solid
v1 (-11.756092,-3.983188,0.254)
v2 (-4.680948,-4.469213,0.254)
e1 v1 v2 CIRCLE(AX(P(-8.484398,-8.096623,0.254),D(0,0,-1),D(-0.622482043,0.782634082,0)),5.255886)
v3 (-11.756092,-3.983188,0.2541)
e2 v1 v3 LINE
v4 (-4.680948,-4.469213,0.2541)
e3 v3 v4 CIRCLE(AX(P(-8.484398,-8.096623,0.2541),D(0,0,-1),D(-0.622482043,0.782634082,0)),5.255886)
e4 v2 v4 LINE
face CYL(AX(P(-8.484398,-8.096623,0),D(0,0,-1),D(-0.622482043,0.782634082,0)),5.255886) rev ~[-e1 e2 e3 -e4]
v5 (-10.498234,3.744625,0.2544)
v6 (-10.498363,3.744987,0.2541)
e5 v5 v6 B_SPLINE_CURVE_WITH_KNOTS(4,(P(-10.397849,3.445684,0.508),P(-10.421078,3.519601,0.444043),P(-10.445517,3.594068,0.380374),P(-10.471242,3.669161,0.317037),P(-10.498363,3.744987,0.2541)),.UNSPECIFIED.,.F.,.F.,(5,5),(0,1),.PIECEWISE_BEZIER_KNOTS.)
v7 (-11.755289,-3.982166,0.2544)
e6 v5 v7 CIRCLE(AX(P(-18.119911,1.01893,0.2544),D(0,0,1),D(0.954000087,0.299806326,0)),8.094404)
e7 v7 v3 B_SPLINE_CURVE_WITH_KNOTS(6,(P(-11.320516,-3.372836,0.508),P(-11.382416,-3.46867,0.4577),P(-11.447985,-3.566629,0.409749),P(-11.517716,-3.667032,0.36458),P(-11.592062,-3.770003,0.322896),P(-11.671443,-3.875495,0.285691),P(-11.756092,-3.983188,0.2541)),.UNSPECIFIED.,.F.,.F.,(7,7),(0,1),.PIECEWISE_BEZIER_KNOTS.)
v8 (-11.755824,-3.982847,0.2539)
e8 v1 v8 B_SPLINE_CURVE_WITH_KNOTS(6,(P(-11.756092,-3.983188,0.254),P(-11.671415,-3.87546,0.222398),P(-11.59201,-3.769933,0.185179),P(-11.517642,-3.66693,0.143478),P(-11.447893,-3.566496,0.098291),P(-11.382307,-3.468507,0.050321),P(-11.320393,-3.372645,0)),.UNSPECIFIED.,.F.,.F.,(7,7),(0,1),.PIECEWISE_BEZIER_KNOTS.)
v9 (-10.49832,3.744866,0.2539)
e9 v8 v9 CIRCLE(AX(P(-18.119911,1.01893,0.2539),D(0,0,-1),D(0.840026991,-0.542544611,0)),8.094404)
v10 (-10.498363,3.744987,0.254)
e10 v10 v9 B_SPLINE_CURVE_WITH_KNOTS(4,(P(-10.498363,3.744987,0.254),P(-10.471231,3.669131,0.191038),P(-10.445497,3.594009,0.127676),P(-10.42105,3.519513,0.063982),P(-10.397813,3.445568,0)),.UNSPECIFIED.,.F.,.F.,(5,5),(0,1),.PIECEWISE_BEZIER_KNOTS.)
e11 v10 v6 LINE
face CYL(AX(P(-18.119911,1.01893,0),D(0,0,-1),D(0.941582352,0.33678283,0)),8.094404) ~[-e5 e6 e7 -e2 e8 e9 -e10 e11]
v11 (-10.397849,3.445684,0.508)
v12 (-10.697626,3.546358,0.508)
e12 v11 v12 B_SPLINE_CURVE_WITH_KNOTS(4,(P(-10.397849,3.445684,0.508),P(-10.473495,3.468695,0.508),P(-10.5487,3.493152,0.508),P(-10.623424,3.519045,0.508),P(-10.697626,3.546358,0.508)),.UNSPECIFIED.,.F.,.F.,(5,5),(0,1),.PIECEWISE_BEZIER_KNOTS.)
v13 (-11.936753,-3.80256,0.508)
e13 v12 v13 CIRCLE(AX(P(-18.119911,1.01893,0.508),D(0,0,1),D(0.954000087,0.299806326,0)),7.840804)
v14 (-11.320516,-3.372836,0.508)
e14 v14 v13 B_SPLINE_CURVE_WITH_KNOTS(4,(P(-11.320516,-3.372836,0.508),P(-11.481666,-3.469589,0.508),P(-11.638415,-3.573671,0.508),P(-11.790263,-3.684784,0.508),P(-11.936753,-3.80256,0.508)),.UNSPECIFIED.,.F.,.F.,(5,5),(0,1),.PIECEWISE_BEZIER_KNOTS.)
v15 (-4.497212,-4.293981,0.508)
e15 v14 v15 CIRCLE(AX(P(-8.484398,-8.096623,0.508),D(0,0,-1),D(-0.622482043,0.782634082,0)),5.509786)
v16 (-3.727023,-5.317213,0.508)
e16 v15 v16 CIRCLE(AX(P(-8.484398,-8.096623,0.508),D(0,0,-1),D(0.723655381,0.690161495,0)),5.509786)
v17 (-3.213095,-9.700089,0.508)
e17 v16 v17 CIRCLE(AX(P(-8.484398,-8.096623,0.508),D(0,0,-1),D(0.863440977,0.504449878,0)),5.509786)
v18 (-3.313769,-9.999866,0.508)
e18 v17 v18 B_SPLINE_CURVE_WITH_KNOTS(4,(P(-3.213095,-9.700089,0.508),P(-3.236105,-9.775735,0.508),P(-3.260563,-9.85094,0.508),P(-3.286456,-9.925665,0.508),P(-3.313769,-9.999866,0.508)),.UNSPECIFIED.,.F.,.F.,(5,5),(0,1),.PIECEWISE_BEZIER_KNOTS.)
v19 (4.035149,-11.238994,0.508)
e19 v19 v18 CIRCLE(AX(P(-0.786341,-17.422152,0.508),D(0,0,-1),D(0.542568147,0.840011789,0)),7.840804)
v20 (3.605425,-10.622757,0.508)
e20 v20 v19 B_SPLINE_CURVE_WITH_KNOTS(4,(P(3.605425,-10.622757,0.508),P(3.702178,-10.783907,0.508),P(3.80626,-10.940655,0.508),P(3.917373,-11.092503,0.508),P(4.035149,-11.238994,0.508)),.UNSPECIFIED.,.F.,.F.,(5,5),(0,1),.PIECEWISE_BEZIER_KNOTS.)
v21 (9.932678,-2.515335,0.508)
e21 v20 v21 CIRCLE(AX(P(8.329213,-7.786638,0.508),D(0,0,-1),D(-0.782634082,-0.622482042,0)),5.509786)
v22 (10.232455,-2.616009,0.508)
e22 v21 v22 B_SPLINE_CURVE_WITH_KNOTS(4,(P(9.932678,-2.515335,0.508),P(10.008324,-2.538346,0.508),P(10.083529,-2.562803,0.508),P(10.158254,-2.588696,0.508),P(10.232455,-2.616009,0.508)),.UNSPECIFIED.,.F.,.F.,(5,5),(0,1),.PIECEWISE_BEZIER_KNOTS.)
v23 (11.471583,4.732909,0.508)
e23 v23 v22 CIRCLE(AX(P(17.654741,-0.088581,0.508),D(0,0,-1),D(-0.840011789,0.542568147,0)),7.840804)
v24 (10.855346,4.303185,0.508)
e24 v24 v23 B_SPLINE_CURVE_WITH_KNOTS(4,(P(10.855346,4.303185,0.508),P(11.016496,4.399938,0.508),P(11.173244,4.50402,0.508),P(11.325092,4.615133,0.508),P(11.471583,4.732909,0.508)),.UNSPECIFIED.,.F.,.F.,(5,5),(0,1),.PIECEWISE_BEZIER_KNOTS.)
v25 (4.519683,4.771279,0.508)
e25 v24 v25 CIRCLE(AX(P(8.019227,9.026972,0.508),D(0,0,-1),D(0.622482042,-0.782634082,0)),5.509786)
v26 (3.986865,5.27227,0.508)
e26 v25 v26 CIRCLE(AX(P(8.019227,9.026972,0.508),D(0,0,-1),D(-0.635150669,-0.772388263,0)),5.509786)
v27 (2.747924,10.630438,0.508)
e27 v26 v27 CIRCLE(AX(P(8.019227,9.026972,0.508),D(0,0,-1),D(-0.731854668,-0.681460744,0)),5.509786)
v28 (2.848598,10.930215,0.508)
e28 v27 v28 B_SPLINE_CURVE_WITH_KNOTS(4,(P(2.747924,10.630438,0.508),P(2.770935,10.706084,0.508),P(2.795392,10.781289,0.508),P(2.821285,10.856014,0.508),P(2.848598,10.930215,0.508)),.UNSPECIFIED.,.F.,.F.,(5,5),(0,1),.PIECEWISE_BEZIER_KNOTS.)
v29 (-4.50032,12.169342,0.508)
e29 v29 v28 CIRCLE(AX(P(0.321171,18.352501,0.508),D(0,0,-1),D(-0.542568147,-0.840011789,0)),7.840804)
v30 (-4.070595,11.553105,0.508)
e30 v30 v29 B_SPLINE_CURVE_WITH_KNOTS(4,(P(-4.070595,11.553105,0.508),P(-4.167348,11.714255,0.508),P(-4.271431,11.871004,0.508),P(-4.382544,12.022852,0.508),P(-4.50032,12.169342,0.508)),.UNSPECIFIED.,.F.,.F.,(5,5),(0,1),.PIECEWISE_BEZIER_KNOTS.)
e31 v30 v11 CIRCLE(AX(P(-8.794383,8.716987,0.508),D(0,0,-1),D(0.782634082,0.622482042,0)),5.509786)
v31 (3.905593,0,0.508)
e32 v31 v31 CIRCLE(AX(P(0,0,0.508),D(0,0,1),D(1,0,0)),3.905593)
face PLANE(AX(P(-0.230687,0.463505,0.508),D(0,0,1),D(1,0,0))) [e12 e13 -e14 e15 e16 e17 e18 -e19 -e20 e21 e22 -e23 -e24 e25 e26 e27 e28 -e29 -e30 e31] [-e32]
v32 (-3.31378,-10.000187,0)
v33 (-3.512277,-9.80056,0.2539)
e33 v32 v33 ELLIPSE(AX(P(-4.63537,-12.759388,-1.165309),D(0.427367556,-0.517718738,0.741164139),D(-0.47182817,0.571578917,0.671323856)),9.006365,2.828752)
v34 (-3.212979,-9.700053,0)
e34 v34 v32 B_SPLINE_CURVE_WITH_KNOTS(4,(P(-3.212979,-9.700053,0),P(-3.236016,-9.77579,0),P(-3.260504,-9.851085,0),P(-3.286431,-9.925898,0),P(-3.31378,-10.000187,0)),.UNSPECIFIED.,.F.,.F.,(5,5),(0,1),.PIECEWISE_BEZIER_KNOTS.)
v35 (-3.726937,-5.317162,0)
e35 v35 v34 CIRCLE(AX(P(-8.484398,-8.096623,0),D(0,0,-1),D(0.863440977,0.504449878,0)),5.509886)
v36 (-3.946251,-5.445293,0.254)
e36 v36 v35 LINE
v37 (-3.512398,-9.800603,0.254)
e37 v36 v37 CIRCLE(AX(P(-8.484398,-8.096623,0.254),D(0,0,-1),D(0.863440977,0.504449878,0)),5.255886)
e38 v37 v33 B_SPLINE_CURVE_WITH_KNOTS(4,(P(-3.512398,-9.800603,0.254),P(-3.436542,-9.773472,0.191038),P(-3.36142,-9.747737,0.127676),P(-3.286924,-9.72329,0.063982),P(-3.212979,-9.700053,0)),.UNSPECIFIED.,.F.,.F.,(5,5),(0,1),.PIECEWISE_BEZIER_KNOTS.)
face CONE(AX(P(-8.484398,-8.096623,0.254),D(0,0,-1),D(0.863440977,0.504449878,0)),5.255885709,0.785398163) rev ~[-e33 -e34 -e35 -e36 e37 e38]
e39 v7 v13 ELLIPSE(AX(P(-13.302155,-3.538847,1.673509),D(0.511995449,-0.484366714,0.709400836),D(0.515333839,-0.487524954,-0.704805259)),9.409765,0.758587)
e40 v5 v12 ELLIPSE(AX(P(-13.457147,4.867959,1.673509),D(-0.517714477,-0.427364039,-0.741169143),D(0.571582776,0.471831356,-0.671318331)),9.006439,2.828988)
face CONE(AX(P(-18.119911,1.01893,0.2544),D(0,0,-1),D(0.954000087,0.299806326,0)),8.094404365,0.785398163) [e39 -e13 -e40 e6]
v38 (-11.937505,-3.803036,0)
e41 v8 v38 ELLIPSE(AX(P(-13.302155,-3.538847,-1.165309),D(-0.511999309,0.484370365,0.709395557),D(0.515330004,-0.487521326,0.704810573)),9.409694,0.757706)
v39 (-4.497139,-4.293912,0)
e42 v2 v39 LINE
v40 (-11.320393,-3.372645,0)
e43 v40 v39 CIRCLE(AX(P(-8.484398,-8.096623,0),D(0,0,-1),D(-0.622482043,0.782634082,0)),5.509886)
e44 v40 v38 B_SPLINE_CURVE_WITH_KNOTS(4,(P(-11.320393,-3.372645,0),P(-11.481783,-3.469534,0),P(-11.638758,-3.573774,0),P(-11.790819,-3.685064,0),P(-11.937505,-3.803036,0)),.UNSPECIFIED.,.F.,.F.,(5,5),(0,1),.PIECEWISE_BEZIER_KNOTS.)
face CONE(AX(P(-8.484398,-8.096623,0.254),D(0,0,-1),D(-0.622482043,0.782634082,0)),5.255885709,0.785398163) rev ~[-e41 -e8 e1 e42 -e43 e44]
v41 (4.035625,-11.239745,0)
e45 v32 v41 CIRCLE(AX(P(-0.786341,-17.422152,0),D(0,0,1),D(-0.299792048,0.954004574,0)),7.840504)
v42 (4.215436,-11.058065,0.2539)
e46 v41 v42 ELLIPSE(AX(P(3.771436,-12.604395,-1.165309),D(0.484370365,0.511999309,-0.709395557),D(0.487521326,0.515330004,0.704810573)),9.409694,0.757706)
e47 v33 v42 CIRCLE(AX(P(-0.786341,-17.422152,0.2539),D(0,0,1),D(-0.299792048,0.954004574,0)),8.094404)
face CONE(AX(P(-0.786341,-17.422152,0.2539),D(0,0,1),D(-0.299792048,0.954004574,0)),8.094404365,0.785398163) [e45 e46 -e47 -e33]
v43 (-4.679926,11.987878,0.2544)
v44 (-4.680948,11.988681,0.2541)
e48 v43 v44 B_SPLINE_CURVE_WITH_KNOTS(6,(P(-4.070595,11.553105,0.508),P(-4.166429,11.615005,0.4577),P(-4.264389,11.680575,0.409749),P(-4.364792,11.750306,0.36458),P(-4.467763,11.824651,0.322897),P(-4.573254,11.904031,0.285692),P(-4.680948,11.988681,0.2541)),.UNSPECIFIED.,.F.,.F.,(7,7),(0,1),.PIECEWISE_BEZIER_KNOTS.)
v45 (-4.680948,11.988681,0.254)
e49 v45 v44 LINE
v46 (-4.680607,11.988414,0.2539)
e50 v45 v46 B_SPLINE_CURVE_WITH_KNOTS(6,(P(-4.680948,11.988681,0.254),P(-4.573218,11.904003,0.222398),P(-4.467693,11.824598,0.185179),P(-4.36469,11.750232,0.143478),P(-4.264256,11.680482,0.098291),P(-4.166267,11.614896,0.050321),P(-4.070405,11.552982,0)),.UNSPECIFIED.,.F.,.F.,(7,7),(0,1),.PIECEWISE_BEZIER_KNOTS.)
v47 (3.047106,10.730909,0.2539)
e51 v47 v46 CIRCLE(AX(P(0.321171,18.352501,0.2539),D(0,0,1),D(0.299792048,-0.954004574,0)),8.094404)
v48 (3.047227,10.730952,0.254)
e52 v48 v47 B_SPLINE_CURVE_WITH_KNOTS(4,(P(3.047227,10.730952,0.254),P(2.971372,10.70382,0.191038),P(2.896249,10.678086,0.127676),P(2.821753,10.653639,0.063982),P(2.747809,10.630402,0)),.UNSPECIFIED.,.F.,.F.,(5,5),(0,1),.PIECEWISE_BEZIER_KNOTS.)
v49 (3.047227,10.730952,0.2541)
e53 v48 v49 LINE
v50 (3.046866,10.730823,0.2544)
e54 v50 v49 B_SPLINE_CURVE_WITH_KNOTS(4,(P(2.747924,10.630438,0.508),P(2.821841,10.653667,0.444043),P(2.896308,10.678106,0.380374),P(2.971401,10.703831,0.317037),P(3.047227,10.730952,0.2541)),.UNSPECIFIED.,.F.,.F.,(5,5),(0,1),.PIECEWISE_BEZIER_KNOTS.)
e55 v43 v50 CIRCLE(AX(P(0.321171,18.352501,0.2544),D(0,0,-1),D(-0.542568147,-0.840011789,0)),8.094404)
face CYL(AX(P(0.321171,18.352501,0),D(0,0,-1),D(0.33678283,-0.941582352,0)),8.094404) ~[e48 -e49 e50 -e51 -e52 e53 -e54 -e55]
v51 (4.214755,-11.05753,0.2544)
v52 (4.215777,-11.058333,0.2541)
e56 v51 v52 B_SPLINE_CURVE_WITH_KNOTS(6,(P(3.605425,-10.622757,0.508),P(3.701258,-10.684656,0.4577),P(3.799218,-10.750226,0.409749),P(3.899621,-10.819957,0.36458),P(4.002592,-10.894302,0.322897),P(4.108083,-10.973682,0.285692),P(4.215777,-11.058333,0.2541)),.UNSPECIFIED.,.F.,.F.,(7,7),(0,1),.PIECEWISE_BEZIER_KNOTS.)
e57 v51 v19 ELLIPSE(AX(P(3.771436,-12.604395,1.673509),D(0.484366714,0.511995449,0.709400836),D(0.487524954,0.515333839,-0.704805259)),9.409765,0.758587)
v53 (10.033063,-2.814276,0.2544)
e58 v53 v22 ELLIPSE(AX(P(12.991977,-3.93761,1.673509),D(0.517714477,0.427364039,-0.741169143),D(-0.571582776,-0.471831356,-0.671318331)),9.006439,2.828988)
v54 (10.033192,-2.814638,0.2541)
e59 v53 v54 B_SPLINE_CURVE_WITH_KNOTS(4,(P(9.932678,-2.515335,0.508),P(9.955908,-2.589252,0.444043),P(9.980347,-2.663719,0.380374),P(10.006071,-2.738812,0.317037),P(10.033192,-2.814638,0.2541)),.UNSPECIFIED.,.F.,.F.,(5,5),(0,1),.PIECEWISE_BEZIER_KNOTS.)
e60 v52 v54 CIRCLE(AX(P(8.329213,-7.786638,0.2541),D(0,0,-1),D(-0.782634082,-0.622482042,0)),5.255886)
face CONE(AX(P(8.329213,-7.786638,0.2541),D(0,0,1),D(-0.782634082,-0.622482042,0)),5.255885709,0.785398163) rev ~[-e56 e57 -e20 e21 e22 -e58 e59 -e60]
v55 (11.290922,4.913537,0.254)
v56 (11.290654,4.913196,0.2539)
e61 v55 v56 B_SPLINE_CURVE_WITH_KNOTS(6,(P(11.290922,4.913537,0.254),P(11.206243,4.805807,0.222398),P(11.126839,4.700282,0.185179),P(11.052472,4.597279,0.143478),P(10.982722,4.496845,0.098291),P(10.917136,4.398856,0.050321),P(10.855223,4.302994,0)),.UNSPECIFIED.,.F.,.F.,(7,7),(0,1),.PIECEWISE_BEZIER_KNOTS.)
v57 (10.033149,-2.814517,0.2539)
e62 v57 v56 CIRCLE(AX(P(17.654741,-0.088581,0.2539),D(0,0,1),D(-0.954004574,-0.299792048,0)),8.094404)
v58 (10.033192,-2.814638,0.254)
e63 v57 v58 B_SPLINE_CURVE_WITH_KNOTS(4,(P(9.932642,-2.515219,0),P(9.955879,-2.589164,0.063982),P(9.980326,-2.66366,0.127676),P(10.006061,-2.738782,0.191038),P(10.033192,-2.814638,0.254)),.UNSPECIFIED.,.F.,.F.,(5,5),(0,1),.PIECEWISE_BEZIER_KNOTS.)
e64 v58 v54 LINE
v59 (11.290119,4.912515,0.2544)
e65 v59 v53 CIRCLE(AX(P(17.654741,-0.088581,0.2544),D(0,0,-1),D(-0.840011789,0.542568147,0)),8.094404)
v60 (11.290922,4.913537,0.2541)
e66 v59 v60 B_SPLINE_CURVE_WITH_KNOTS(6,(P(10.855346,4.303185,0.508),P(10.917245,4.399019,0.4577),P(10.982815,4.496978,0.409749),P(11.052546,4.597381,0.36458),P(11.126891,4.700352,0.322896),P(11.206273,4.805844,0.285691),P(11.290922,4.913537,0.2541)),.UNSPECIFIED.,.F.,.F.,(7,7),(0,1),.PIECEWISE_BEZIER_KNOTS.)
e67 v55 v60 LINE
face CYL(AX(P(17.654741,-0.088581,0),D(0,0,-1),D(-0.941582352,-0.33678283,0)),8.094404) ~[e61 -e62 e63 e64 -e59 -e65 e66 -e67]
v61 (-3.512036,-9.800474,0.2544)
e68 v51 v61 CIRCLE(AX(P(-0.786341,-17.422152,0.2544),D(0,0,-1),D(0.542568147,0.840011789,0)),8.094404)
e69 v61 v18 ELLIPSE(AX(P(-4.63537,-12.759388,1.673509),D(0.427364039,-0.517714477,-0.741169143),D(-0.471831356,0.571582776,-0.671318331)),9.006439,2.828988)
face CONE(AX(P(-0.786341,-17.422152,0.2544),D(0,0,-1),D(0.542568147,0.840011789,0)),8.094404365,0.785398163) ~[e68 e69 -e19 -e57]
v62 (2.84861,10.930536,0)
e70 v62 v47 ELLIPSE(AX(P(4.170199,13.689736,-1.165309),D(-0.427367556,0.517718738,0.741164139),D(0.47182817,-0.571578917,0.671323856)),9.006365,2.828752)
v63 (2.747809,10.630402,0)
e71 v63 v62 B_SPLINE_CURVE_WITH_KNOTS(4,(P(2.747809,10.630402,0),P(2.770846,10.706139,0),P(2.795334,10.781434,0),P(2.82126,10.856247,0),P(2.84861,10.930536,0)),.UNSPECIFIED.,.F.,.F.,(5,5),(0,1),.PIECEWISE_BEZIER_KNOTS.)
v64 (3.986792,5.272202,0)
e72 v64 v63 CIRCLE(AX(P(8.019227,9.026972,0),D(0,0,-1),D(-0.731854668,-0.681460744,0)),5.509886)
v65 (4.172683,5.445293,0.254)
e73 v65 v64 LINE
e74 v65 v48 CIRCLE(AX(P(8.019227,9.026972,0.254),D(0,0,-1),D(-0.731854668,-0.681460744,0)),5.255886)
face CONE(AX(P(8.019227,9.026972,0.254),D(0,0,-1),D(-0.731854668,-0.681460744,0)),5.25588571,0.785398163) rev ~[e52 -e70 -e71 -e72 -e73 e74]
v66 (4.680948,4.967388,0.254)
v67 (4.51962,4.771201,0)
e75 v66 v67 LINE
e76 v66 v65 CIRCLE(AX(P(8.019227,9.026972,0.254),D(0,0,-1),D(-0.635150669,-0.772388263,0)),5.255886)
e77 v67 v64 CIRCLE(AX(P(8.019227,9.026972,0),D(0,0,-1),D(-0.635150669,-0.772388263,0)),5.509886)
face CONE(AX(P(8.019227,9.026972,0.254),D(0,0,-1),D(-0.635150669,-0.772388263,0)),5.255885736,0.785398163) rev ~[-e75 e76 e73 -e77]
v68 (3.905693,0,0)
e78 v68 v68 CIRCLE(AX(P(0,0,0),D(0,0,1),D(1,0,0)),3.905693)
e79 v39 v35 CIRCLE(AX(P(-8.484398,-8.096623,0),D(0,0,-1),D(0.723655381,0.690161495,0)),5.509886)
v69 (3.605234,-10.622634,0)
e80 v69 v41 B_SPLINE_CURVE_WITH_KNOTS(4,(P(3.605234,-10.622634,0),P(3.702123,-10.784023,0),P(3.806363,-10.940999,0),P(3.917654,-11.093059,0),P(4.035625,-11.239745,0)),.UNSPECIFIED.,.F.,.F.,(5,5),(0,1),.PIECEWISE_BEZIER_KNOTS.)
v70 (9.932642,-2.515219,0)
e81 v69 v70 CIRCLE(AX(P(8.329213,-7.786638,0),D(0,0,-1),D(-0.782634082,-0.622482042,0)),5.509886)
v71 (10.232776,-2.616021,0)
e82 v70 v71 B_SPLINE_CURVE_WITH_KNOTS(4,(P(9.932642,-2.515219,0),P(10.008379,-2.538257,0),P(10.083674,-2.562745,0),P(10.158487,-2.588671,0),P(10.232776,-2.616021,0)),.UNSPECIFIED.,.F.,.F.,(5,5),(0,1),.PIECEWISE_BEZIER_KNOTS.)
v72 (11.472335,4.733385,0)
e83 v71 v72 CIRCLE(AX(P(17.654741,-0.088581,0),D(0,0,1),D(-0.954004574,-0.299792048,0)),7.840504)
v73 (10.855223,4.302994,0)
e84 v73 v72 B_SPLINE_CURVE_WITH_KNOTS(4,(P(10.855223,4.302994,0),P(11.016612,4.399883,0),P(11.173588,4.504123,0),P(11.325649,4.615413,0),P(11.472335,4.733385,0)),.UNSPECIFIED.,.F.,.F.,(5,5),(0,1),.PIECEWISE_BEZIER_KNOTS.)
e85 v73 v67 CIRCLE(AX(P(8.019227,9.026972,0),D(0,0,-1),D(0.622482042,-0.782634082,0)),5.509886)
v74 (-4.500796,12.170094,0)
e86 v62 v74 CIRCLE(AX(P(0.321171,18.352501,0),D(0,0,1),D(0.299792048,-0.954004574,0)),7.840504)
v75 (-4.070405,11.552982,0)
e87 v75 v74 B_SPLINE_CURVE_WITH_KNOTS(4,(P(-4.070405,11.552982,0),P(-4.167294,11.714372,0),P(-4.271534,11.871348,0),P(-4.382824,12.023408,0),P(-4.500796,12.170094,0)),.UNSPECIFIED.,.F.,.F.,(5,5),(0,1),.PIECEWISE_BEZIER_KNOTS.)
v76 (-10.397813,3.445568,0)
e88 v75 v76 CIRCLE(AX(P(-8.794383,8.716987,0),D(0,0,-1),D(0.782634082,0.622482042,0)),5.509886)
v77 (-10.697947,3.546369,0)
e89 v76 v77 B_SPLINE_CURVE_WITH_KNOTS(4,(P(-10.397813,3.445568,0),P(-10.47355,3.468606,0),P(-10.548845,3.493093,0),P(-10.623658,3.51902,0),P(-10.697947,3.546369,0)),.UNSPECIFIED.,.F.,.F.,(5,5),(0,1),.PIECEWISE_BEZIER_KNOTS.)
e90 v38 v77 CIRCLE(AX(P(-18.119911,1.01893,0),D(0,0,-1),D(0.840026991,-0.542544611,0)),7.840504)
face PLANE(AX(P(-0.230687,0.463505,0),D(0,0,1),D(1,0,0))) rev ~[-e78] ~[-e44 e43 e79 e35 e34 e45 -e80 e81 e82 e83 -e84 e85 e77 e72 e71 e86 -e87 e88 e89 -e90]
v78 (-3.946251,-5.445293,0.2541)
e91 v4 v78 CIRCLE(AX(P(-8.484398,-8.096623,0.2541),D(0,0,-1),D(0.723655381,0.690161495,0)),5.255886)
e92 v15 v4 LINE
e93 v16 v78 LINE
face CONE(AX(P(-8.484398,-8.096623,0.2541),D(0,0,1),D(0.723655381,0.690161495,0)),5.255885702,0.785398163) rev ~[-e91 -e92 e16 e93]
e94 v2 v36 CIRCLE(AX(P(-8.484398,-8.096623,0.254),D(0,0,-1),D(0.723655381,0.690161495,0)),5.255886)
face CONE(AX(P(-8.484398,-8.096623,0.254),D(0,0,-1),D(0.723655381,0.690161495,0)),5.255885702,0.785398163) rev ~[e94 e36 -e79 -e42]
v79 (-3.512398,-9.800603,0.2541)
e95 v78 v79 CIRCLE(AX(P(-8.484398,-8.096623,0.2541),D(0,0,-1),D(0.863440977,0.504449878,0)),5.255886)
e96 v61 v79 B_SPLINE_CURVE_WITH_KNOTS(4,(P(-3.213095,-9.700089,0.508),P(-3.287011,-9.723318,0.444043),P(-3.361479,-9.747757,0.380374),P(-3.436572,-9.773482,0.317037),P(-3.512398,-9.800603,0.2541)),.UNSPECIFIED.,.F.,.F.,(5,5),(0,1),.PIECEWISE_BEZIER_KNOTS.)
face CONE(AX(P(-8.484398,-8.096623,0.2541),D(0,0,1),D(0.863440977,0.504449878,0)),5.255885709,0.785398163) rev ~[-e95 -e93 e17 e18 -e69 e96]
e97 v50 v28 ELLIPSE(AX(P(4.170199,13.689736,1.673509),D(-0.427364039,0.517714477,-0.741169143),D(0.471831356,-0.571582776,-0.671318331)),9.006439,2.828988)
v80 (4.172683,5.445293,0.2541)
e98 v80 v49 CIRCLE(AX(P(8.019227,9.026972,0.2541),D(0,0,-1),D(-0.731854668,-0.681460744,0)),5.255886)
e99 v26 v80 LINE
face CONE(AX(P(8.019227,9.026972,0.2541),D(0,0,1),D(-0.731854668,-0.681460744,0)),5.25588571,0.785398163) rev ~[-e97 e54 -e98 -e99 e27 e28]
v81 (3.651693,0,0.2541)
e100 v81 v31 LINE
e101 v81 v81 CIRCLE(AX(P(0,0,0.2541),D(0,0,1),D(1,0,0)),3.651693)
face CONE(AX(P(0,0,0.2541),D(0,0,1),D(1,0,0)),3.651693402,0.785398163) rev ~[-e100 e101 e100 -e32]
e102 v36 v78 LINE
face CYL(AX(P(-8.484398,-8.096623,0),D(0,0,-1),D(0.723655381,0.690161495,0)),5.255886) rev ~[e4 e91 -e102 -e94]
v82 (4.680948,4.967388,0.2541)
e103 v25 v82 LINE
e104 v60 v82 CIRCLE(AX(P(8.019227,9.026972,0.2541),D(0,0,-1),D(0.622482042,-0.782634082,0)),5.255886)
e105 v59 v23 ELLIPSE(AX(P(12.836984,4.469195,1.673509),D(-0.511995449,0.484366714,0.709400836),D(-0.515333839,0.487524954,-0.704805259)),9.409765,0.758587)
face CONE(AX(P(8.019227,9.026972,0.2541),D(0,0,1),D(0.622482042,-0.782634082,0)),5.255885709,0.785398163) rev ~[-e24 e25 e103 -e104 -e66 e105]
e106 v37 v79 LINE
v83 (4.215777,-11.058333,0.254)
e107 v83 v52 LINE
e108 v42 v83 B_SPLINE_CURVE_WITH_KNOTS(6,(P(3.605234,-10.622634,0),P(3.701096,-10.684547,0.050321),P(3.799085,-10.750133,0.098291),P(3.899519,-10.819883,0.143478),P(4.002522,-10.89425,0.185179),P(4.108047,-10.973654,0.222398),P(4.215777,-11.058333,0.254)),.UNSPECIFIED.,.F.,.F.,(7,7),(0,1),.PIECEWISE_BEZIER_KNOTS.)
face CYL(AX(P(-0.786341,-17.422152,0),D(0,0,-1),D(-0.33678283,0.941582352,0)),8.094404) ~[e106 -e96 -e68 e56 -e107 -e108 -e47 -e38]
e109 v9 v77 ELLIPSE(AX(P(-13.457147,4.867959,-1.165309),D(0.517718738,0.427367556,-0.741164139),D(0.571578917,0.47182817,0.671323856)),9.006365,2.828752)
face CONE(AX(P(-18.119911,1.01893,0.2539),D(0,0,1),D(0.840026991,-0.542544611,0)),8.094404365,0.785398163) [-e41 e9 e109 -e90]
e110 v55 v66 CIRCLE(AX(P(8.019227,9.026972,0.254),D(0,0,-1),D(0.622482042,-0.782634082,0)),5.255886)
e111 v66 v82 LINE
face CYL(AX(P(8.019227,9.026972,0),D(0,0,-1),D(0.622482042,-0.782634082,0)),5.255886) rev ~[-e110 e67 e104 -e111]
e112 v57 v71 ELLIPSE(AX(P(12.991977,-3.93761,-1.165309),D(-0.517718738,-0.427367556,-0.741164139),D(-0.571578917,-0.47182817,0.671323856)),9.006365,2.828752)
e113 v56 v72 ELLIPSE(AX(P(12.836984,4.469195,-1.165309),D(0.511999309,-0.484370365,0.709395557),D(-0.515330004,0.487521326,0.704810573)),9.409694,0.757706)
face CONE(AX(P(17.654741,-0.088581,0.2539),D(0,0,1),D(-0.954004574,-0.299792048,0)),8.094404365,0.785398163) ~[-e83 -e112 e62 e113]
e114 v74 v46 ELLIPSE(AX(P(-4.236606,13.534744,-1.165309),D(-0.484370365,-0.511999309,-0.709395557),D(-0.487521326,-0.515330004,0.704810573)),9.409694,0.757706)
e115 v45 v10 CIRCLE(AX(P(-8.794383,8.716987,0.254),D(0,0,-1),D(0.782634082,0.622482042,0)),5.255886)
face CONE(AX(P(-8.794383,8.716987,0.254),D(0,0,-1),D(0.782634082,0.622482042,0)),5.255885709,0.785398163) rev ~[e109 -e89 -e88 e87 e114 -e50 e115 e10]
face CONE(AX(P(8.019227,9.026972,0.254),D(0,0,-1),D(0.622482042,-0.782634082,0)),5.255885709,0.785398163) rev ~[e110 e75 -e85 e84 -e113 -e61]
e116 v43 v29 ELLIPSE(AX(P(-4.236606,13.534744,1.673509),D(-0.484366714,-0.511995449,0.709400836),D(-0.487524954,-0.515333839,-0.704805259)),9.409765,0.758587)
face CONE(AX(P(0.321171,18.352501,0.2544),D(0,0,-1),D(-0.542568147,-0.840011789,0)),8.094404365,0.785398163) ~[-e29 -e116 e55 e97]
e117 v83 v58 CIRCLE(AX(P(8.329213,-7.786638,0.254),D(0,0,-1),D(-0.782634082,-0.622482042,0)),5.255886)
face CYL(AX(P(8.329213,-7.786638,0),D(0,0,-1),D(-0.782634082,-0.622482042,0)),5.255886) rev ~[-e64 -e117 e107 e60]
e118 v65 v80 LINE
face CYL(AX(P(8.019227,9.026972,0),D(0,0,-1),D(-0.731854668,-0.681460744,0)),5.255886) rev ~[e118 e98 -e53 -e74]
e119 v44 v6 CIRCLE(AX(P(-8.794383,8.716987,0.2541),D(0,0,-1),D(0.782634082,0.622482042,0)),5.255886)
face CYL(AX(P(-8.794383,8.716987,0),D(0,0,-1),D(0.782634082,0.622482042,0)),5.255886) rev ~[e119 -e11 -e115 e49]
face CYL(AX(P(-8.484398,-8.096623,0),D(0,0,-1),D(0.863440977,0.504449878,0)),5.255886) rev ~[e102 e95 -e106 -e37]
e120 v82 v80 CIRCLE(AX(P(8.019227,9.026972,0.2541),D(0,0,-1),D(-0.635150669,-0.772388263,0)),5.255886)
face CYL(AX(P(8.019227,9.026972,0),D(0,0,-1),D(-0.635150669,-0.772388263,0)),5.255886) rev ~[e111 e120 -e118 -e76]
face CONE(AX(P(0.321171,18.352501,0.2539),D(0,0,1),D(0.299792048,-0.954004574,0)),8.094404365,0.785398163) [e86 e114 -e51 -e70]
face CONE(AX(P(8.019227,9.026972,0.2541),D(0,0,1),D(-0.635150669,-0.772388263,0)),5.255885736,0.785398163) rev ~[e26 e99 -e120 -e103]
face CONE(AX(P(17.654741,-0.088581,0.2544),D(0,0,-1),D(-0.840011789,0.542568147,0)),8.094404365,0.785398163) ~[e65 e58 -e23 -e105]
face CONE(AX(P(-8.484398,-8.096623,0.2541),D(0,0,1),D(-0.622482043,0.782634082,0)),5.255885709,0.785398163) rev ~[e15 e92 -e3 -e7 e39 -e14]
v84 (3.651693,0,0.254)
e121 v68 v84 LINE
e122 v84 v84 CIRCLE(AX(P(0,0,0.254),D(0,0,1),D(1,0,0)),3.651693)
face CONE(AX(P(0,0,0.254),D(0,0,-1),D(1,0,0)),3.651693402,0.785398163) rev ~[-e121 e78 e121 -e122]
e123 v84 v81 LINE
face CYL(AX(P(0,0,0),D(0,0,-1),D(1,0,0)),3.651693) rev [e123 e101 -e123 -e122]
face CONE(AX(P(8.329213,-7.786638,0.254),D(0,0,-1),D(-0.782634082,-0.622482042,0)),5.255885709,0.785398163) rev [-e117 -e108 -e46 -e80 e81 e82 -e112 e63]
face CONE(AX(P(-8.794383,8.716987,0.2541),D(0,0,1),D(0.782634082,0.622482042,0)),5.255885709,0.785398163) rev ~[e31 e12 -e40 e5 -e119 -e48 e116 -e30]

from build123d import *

# Parameters (mm, degrees)
F0_R        = 3.6516934022
F1_DEPTH    = 0.508
F2_C1_SIZE  = 0.254
F2_C2_SIZE  = 0.2539
F2_C3_SIZE  = 0.254
F2_C4_SIZE  = 0.2539
F2_C5_SIZE  = 0.254
F2_C6_SIZE  = 0.2539
F2_C7_SIZE  = 0.254
F2_C8_SIZE  = 0.2539
F2_C9_SIZE  = 0.2539
F2_C10_SIZE = 0.2536
F2_C11_SIZE = 0.254
F2_C12_SIZE = 0.2539
F2_C13_SIZE = 0.2539
F2_C14_SIZE = 0.2536
F2_C15_SIZE = 0.2539
F2_C16_SIZE = 0.2536
F2_C17_SIZE = 0.2539
F2_C18_SIZE = 0.2536


# Not quite as in the source:
# - a fillet or chamfer is up to 0.001 mm smaller than in the source, because OpenCascade refuses the exact size


with BuildPart() as f1:
    # F0 (on Top) → F1 (new body)
    with BuildSketch(Plane.XY):
        with BuildLine():
            ThreePointArc((-4.6809479161, -4.4692134998), (-4.2851428425, -4.9358337251), (-3.9462508024, -5.445292532))
            ThreePointArc((-3.9462508024, -5.445292532), (-3.2543970352, -7.5756381968), (-3.5123975908, -9.8006033651))
            ThreePointArc((-3.5123975908, -9.8006033651), (0.5657181683, -9.1143610896), (4.2157772611, -11.0583325976))
            ThreePointArc((4.2157772611, -11.0583325976), (4.0349146255, -4.7562355253), (10.0331924761, -2.8146378249))
            ThreePointArc((10.0331924761, -2.8146378249), (9.3469502005, 1.2634779342), (11.2909217086, 4.913537027))
            ThreePointArc((11.2909217086, 4.913537027), (7.9764094343, 3.7712610201), (4.6809479161, 4.9673878837))
            ThreePointArc((4.6809479161, 4.9673878837), (4.4188770442, 5.1978976137), (4.1726827472, 5.445292532))
            ThreePointArc((4.1726827472, 5.445292532), (2.8785820733, 7.9323939108), (3.0472269358, 10.730952242))
            ThreePointArc((3.0472269358, 10.730952242), (-1.0308888232, 10.0447099664), (-4.6809479161, 11.9886814745))
            ThreePointArc((-4.6809479161, 11.9886814745), (-4.5000852805, 5.6865844021), (-10.498363131, 3.7449867017))
            ThreePointArc((-10.498363131, 3.7449867017), (-9.8121208555, -0.3331290573), (-11.7560923635, -3.9831881502))
            ThreePointArc((-11.7560923635, -3.9831881502), (-8.1241949781, -2.8530951946), (-4.6809479161, -4.4692134998))
        make_face()
        Circle(F0_R, mode=Mode.SUBTRACT)
        with BuildLine():
            ThreePointArc((-10.498363131, 3.7449867017), (-26.1092040598, 2.319155388), (-11.7560923635, -3.9831881502))
            ThreePointArc((-11.7560923635, -3.9831881502), (-9.8121208555, -0.3331290573), (-10.498363131, 3.7449867017))
        make_face()
        with BuildLine():
            ThreePointArc((4.2157772611, -11.0583325976), (0.5657181683, -9.1143610896), (-3.5123975908, -9.8006033651))
            ThreePointArc((-3.5123975908, -9.8006033651), (-2.0865662771, -25.4114442939), (4.2157772611, -11.0583325976))
        make_face()
        with BuildLine():
            ThreePointArc((11.2909217086, 4.913537027), (9.3469502005, 1.2634779342), (10.0331924761, -2.8146378249))
            ThreePointArc((10.0331924761, -2.8146378249), (25.6440334048, -1.3888065112), (11.2909217086, 4.913537027))
        make_face()
        with BuildLine():
            ThreePointArc((3.0472269358, 10.730952242), (1.6213956221, 26.3417931707), (-4.6809479161, 11.9886814745))
            ThreePointArc((-4.6809479161, 11.9886814745), (-1.0308888232, 10.0447099664), (3.0472269358, 10.730952242))
        make_face()
    extrude(amount=F1_DEPTH)

    # F2: chamfer of 0.254 on 18 edges, made by hand

    # F2_c1
    f2_c1_edges = [f1.edges().sort_by_distance(p)[0] for p in [
        (-5.4539952912, -3.8023255146, 0),
    ]]
    chamfer(f2_c1_edges, length=F2_C1_SIZE)

    # F2_c2 (size 0.254 in the source; OpenCascade refuses exactly that, so slightly less here)
    f2_c2_edges = [f1.edges().sort_by_distance(p)[0] for p in [
        (-5.4539952912, -3.8023255146, 0.508),
    ]]
    chamfer(f2_c2_edges, length=F2_C2_SIZE)

    # F2_c3
    f2_c3_edges = [f1.edges().sort_by_distance(p)[0] for p in [
        (4.0349146255, -4.7562355253, 0),
    ]]
    chamfer(f2_c3_edges, length=F2_C3_SIZE)

    # F2_c4 (size 0.254 in the source; OpenCascade refuses exactly that, so slightly less here)
    f2_c4_edges = [f1.edges().sort_by_distance(p)[0] for p in [
        (4.0349146255, -4.7562355253, 0.508),
    ]]
    chamfer(f2_c4_edges, length=F2_C4_SIZE)

    # F2_c5
    f2_c5_edges = [f1.edges().sort_by_distance(p)[0] for p in [
        (4.9888246362, 4.7326743914, 0),
    ]]
    chamfer(f2_c5_edges, length=F2_C5_SIZE)

    # F2_c6 (size 0.254 in the source; OpenCascade refuses exactly that, so slightly less here)
    f2_c6_edges = [f1.edges().sort_by_distance(p)[0] for p in [
        (4.9888246362, 4.7326743914, 0.508),
    ]]
    chamfer(f2_c6_edges, length=F2_C6_SIZE)

    # F2_c7
    f2_c7_edges = [f1.edges().sort_by_distance(p)[0] for p in [
        (-4.5000852805, 5.6865844021, 0),
    ]]
    chamfer(f2_c7_edges, length=F2_C7_SIZE)

    # F2_c8 (size 0.254 in the source; OpenCascade refuses exactly that, so slightly less here)
    f2_c8_edges = [f1.edges().sort_by_distance(p)[0] for p in [
        (-4.5000852805, 5.6865844021, 0.508),
    ]]
    chamfer(f2_c8_edges, length=F2_C8_SIZE)

    # F2_c9 (size 0.254 in the source; OpenCascade refuses exactly that, so slightly less here)
    f2_c9_edges = [f1.edges().sort_by_distance(p)[0] for p in [
        (-26.1092040598, 2.319155388, 0),
    ]]
    chamfer(f2_c9_edges, length=F2_C9_SIZE)

    # F2_c10 (size 0.254 in the source; OpenCascade refuses exactly that, so slightly less here)
    f2_c10_edges = [f1.edges().sort_by_distance(p)[0] for p in [
        (-26.1092040598, 2.319155388, 0.508),
    ]]
    chamfer(f2_c10_edges, length=F2_C10_SIZE)

    # F2_c11
    f2_c11_edges = [f1.edges().sort_by_distance(p)[0] for p in [
        (-3.6516934022, 0, 0),
    ]]
    chamfer(f2_c11_edges, length=F2_C11_SIZE)

    # F2_c12 (size 0.254 in the source; OpenCascade refuses exactly that, so slightly less here)
    f2_c12_edges = [f1.edges().sort_by_distance(p)[0] for p in [
        (-3.6516934022, 0, 0.508),
    ]]
    chamfer(f2_c12_edges, length=F2_C12_SIZE)

    # F2_c13 (size 0.254 in the source; OpenCascade refuses exactly that, so slightly less here)
    f2_c13_edges = [f1.edges().sort_by_distance(p)[0] for p in [
        (-2.0865662771, -25.4114442939, 0),
    ]]
    chamfer(f2_c13_edges, length=F2_C13_SIZE)

    # F2_c14 (size 0.254 in the source; OpenCascade refuses exactly that, so slightly less here)
    f2_c14_edges = [f1.edges().sort_by_distance(p)[0] for p in [
        (-2.0865662771, -25.4114442939, 0.508),
    ]]
    chamfer(f2_c14_edges, length=F2_C14_SIZE)

    # F2_c15 (size 0.254 in the source; OpenCascade refuses exactly that, so slightly less here)
    f2_c15_edges = [f1.edges().sort_by_distance(p)[0] for p in [
        (25.6440334048, -1.3888065112, 0),
    ]]
    chamfer(f2_c15_edges, length=F2_C15_SIZE)

    # F2_c16 (size 0.254 in the source; OpenCascade refuses exactly that, so slightly less here)
    f2_c16_edges = [f1.edges().sort_by_distance(p)[0] for p in [
        (25.6440334048, -1.3888065112, 0.508),
    ]]
    chamfer(f2_c16_edges, length=F2_C16_SIZE)

    # F2_c17 (size 0.254 in the source; OpenCascade refuses exactly that, so slightly less here)
    f2_c17_edges = [f1.edges().sort_by_distance(p)[0] for p in [
        (1.6213956221, 26.3417931707, 0),
    ]]
    chamfer(f2_c17_edges, length=F2_C17_SIZE)

    # F2_c18 (size 0.254 in the source; OpenCascade refuses exactly that, so slightly less here)
    f2_c18_edges = [f1.edges().sort_by_distance(p)[0] for p in [
        (1.6213956221, 26.3417931707, 0.508),
    ]]
    chamfer(f2_c18_edges, length=F2_C18_SIZE)


solid = f1.part
